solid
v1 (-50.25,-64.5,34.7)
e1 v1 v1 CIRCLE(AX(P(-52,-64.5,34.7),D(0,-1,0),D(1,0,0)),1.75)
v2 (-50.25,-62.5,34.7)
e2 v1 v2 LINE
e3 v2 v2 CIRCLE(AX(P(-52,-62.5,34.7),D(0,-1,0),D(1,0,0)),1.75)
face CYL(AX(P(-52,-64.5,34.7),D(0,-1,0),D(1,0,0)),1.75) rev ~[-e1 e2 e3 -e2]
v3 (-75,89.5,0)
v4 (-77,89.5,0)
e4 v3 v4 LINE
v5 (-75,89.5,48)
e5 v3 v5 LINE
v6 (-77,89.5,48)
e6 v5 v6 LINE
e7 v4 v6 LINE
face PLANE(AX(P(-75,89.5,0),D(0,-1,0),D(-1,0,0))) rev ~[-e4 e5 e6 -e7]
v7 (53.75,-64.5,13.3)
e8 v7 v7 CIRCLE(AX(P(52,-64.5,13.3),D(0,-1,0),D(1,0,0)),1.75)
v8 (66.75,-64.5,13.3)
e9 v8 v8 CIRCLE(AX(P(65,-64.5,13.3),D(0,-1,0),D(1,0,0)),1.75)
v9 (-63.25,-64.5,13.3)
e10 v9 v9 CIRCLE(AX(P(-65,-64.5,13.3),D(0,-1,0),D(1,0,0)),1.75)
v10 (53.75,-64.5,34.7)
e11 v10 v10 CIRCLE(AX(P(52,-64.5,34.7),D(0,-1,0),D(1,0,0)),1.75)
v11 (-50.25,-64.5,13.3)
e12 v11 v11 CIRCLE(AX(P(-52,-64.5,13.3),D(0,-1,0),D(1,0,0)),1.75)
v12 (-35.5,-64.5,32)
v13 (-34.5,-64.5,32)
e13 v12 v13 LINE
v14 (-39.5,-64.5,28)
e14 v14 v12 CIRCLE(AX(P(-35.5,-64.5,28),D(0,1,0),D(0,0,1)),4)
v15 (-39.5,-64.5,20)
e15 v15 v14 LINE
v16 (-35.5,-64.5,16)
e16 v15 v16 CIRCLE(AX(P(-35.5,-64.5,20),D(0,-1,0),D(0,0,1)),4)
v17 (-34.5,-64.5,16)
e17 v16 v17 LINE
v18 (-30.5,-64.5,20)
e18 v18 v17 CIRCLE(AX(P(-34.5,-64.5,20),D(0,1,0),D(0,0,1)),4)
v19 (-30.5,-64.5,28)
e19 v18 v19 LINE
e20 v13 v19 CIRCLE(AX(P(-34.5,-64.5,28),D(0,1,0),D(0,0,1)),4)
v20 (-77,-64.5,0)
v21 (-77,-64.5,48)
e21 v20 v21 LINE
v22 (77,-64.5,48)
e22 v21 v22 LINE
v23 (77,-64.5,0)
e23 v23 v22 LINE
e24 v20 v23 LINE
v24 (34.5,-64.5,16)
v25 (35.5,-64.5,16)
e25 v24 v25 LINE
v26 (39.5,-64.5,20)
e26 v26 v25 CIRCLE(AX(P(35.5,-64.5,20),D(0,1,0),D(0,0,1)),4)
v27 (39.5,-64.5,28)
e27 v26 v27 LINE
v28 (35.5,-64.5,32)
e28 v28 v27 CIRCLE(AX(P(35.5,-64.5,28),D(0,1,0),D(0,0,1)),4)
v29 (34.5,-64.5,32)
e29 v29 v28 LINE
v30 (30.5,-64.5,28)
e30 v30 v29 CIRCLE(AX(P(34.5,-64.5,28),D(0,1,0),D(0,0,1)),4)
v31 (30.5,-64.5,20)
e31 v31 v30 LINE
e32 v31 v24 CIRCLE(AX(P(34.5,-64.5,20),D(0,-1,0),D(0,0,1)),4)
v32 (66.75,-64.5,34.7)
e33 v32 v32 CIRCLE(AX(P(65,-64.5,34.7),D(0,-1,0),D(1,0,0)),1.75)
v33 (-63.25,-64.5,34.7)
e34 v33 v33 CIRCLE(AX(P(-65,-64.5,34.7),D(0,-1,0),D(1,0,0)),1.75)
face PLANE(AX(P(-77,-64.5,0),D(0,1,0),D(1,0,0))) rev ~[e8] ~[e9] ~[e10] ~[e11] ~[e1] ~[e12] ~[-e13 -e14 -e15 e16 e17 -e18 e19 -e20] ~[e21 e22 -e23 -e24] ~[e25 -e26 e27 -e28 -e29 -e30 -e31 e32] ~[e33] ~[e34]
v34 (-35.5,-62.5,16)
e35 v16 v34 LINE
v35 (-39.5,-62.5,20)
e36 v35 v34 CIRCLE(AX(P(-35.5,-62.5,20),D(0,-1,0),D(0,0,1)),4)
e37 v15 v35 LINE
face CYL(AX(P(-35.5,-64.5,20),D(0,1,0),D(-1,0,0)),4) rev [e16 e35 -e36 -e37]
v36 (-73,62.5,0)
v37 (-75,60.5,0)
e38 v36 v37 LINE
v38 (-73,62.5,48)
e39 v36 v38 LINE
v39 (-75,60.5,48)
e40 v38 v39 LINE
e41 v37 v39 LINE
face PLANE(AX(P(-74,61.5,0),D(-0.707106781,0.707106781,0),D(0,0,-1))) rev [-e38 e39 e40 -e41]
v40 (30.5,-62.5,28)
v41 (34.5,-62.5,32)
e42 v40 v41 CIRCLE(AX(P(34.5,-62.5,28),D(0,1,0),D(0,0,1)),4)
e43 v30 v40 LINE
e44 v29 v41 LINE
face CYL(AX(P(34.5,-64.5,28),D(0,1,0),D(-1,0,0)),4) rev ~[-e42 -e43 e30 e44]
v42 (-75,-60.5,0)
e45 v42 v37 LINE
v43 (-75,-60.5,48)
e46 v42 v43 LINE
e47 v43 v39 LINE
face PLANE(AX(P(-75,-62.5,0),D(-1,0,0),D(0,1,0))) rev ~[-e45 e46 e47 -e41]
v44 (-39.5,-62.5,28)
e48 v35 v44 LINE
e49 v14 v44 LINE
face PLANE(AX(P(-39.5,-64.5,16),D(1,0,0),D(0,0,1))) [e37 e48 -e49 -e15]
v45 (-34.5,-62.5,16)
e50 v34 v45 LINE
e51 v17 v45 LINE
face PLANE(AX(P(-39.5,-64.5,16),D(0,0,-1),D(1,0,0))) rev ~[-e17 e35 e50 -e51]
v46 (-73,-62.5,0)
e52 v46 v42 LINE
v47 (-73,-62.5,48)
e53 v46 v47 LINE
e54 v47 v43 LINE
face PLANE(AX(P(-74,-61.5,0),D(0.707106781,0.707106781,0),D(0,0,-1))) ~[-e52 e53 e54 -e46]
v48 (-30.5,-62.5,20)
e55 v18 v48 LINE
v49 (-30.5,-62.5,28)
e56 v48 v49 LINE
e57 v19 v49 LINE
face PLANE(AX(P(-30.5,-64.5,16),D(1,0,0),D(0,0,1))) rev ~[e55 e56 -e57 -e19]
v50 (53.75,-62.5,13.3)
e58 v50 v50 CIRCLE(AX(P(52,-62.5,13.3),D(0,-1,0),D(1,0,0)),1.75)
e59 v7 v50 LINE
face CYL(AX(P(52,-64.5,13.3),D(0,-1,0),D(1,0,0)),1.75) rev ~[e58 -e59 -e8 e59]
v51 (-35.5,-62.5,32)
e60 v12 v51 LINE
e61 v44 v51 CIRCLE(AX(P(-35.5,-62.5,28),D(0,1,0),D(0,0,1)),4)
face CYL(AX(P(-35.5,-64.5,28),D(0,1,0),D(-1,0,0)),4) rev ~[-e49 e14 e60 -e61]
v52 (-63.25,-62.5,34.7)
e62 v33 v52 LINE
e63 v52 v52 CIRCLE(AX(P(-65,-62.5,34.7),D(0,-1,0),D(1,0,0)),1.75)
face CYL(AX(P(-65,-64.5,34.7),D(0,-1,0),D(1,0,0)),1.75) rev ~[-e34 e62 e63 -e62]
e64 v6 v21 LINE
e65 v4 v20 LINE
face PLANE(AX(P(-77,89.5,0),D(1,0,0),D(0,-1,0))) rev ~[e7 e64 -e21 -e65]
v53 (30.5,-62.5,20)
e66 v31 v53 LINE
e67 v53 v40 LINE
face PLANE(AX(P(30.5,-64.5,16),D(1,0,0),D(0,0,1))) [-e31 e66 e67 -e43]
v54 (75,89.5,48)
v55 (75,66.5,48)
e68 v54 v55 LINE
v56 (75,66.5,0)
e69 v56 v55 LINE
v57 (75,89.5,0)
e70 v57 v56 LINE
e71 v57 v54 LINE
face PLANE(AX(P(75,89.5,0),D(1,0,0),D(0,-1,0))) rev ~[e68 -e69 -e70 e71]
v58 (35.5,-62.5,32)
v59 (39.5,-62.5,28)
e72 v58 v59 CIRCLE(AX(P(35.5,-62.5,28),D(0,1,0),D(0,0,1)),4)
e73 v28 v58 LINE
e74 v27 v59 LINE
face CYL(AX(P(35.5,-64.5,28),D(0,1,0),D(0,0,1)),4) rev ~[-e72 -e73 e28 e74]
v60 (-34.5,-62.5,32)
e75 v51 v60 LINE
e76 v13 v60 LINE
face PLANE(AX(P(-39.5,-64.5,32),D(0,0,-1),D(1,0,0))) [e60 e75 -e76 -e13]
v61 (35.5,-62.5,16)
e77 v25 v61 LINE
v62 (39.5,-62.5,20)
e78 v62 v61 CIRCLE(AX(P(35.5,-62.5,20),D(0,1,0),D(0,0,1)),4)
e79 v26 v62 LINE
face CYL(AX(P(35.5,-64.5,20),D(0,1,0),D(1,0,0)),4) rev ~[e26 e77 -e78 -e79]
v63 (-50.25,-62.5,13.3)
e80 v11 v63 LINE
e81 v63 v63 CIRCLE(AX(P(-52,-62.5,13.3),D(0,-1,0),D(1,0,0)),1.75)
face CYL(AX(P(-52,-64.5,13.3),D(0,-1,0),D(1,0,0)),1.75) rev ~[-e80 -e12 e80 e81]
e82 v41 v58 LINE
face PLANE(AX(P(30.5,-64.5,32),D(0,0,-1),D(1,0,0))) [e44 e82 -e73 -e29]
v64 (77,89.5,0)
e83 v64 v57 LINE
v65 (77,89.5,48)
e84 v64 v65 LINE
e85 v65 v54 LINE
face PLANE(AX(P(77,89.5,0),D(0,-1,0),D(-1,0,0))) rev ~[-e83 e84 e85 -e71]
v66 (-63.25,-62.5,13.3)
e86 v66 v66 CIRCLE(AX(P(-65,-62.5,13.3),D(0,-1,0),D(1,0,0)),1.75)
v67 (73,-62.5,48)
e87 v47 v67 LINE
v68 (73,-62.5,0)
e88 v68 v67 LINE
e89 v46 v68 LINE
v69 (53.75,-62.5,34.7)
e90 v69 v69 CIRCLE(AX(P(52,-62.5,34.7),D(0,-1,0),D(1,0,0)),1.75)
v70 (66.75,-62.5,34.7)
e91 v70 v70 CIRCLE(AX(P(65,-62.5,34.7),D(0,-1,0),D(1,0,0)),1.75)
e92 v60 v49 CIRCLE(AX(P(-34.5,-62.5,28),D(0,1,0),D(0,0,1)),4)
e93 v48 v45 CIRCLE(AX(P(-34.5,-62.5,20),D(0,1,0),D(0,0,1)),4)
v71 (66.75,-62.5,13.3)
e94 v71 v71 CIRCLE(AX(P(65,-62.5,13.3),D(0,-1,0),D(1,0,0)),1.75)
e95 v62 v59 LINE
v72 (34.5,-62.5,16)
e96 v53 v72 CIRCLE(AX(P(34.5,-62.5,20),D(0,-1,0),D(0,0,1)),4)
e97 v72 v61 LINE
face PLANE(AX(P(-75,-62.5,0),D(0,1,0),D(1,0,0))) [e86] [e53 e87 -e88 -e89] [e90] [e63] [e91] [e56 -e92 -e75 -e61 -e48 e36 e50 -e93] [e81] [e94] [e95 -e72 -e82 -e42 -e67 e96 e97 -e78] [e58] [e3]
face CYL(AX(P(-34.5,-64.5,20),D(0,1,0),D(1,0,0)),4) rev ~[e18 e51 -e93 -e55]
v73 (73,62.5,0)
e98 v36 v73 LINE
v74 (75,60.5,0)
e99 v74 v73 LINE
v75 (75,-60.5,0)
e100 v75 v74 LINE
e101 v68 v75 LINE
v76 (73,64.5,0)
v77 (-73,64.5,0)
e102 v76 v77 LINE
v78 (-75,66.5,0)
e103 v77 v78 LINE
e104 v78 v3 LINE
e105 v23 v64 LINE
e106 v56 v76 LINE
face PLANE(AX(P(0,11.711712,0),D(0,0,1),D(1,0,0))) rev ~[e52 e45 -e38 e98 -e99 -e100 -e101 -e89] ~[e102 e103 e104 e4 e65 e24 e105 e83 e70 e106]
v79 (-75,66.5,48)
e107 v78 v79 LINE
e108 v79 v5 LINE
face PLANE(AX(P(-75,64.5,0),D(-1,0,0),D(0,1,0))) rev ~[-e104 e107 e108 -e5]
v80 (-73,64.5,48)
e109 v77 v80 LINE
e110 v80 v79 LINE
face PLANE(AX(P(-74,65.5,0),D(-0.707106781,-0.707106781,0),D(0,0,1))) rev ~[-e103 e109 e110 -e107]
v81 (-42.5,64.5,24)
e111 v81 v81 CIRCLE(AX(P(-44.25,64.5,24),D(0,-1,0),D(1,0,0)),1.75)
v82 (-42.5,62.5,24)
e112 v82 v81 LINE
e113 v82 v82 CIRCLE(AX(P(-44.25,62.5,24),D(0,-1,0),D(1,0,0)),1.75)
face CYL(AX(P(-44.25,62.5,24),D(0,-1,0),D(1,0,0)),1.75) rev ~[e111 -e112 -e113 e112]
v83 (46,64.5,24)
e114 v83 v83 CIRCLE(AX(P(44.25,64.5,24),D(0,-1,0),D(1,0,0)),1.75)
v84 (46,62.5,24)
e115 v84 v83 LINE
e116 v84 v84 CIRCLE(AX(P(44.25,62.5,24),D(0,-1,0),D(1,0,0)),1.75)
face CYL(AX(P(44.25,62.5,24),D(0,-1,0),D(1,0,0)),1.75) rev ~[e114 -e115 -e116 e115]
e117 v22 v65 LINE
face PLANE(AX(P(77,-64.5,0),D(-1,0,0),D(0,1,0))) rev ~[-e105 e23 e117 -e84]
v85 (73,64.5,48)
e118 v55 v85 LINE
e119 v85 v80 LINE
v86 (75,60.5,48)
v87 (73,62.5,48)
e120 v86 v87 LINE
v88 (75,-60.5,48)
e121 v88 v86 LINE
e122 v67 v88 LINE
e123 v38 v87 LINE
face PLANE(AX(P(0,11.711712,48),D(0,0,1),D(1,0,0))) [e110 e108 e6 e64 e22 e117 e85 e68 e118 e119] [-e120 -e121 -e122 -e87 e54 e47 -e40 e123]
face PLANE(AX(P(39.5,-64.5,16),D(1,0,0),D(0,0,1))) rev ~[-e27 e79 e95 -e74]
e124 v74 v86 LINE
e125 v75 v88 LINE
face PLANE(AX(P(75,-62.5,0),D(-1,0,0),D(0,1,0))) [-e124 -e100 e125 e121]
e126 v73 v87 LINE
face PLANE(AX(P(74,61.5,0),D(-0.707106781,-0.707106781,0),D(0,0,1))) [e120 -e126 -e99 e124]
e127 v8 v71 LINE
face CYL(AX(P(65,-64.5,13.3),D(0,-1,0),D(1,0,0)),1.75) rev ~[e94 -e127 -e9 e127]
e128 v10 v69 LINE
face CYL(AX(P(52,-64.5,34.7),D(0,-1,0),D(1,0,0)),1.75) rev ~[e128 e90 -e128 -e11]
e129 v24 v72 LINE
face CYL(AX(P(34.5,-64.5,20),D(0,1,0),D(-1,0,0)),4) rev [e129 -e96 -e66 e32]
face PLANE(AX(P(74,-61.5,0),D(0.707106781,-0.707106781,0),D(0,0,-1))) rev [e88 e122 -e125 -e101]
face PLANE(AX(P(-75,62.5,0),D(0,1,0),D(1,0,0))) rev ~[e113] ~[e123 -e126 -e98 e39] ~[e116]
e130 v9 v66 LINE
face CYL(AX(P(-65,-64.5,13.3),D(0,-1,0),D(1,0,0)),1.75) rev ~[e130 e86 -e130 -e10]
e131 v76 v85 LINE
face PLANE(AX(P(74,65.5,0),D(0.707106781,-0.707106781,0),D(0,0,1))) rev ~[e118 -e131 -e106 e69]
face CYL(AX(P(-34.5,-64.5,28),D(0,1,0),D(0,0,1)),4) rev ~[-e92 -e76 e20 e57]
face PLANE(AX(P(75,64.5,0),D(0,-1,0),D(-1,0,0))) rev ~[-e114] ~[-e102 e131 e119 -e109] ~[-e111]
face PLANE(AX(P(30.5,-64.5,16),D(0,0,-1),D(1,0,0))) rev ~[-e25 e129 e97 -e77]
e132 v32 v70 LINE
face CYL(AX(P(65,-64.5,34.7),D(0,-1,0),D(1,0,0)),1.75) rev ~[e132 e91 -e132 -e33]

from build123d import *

# Parameters (mm, degrees)
F0_W     = 150
F0_H     = 125
F1_DEPTH = 48
F2_R     = 1.75
F2_W     = 9
F2_H     = 16
F3_DEPTH = 2
F4_R     = 1.75
F5_DEPTH = 2
F6_SIZE  = 2
F7_R     = 4


with BuildPart() as f1:
    # F0 (on Top) → F1 (new body)
    with BuildSketch(Plane.XY):
        Polygon((75, 89.5), (75, 64.5), (-75, 64.5), (-75, 89.5), (-77, 89.5), (-77, 64.5), (-77, -64.5), (77, -64.5), (77, 64.5), (77, 89.5), align=None)
        Rectangle(F0_W, F0_H, mode=Mode.SUBTRACT)
    extrude(amount=F1_DEPTH)

    # F2 (on face) → F3 (cut)
    with BuildSketch(Plane.XZ.offset(64.5)):
        with Locations((-65, 34.7)):
            Circle(F2_R)
        with Locations((-52, 34.7)):
            Circle(F2_R)
        with Locations((-65, 13.3)):
            Circle(F2_R)
        with Locations((-52, 13.3)):
            Circle(F2_R)
        with Locations((52, 34.7)):
            Circle(F2_R)
        with Locations((65, 34.7)):
            Circle(F2_R)
        with Locations((52, 13.3)):
            Circle(F2_R)
        with Locations((65, 13.3)):
            Circle(F2_R)
        with Locations((-35, 24)):
            Rectangle(F2_W, F2_H)
        with Locations((35, 24)):
            Rectangle(F2_W, F2_H)
    extrude(amount=-F3_DEPTH, mode=Mode.SUBTRACT)

    # F4 (on face) → F5 (cut)
    with BuildSketch(Plane.XZ.offset(-62.5)):
        with Locations((-44.25, 24)):
            Circle(F4_R)
        with Locations((44.25, 24)):
            Circle(F4_R)
    extrude(amount=-F5_DEPTH, mode=Mode.SUBTRACT)

    # F6
    f6_edges = [f1.edges().sort_by_distance(p)[0] for p in [
        (-75, 62.5, 24),
        (-75, -62.5, 24),
        (75, -62.5, 24),
        (75, 62.5, 24),
        (75, 64.5, 24),
        (-75, 64.5, 24),
    ]]
    chamfer(f6_edges, length=F6_SIZE)

    # F7
    f7_edges = [f1.edges().sort_by_distance(p)[0] for p in [
        (-39.5, -63.5, 16),
        (-30.5, -63.5, 16),
        (-30.5, -63.5, 32),
        (-39.5, -63.5, 32),
        (30.5, -63.5, 16),
        (39.5, -63.5, 16),
        (39.5, -63.5, 32),
        (30.5, -63.5, 32),
    ]]
    fillet(f7_edges, radius=F7_R)


solid = f1.part
